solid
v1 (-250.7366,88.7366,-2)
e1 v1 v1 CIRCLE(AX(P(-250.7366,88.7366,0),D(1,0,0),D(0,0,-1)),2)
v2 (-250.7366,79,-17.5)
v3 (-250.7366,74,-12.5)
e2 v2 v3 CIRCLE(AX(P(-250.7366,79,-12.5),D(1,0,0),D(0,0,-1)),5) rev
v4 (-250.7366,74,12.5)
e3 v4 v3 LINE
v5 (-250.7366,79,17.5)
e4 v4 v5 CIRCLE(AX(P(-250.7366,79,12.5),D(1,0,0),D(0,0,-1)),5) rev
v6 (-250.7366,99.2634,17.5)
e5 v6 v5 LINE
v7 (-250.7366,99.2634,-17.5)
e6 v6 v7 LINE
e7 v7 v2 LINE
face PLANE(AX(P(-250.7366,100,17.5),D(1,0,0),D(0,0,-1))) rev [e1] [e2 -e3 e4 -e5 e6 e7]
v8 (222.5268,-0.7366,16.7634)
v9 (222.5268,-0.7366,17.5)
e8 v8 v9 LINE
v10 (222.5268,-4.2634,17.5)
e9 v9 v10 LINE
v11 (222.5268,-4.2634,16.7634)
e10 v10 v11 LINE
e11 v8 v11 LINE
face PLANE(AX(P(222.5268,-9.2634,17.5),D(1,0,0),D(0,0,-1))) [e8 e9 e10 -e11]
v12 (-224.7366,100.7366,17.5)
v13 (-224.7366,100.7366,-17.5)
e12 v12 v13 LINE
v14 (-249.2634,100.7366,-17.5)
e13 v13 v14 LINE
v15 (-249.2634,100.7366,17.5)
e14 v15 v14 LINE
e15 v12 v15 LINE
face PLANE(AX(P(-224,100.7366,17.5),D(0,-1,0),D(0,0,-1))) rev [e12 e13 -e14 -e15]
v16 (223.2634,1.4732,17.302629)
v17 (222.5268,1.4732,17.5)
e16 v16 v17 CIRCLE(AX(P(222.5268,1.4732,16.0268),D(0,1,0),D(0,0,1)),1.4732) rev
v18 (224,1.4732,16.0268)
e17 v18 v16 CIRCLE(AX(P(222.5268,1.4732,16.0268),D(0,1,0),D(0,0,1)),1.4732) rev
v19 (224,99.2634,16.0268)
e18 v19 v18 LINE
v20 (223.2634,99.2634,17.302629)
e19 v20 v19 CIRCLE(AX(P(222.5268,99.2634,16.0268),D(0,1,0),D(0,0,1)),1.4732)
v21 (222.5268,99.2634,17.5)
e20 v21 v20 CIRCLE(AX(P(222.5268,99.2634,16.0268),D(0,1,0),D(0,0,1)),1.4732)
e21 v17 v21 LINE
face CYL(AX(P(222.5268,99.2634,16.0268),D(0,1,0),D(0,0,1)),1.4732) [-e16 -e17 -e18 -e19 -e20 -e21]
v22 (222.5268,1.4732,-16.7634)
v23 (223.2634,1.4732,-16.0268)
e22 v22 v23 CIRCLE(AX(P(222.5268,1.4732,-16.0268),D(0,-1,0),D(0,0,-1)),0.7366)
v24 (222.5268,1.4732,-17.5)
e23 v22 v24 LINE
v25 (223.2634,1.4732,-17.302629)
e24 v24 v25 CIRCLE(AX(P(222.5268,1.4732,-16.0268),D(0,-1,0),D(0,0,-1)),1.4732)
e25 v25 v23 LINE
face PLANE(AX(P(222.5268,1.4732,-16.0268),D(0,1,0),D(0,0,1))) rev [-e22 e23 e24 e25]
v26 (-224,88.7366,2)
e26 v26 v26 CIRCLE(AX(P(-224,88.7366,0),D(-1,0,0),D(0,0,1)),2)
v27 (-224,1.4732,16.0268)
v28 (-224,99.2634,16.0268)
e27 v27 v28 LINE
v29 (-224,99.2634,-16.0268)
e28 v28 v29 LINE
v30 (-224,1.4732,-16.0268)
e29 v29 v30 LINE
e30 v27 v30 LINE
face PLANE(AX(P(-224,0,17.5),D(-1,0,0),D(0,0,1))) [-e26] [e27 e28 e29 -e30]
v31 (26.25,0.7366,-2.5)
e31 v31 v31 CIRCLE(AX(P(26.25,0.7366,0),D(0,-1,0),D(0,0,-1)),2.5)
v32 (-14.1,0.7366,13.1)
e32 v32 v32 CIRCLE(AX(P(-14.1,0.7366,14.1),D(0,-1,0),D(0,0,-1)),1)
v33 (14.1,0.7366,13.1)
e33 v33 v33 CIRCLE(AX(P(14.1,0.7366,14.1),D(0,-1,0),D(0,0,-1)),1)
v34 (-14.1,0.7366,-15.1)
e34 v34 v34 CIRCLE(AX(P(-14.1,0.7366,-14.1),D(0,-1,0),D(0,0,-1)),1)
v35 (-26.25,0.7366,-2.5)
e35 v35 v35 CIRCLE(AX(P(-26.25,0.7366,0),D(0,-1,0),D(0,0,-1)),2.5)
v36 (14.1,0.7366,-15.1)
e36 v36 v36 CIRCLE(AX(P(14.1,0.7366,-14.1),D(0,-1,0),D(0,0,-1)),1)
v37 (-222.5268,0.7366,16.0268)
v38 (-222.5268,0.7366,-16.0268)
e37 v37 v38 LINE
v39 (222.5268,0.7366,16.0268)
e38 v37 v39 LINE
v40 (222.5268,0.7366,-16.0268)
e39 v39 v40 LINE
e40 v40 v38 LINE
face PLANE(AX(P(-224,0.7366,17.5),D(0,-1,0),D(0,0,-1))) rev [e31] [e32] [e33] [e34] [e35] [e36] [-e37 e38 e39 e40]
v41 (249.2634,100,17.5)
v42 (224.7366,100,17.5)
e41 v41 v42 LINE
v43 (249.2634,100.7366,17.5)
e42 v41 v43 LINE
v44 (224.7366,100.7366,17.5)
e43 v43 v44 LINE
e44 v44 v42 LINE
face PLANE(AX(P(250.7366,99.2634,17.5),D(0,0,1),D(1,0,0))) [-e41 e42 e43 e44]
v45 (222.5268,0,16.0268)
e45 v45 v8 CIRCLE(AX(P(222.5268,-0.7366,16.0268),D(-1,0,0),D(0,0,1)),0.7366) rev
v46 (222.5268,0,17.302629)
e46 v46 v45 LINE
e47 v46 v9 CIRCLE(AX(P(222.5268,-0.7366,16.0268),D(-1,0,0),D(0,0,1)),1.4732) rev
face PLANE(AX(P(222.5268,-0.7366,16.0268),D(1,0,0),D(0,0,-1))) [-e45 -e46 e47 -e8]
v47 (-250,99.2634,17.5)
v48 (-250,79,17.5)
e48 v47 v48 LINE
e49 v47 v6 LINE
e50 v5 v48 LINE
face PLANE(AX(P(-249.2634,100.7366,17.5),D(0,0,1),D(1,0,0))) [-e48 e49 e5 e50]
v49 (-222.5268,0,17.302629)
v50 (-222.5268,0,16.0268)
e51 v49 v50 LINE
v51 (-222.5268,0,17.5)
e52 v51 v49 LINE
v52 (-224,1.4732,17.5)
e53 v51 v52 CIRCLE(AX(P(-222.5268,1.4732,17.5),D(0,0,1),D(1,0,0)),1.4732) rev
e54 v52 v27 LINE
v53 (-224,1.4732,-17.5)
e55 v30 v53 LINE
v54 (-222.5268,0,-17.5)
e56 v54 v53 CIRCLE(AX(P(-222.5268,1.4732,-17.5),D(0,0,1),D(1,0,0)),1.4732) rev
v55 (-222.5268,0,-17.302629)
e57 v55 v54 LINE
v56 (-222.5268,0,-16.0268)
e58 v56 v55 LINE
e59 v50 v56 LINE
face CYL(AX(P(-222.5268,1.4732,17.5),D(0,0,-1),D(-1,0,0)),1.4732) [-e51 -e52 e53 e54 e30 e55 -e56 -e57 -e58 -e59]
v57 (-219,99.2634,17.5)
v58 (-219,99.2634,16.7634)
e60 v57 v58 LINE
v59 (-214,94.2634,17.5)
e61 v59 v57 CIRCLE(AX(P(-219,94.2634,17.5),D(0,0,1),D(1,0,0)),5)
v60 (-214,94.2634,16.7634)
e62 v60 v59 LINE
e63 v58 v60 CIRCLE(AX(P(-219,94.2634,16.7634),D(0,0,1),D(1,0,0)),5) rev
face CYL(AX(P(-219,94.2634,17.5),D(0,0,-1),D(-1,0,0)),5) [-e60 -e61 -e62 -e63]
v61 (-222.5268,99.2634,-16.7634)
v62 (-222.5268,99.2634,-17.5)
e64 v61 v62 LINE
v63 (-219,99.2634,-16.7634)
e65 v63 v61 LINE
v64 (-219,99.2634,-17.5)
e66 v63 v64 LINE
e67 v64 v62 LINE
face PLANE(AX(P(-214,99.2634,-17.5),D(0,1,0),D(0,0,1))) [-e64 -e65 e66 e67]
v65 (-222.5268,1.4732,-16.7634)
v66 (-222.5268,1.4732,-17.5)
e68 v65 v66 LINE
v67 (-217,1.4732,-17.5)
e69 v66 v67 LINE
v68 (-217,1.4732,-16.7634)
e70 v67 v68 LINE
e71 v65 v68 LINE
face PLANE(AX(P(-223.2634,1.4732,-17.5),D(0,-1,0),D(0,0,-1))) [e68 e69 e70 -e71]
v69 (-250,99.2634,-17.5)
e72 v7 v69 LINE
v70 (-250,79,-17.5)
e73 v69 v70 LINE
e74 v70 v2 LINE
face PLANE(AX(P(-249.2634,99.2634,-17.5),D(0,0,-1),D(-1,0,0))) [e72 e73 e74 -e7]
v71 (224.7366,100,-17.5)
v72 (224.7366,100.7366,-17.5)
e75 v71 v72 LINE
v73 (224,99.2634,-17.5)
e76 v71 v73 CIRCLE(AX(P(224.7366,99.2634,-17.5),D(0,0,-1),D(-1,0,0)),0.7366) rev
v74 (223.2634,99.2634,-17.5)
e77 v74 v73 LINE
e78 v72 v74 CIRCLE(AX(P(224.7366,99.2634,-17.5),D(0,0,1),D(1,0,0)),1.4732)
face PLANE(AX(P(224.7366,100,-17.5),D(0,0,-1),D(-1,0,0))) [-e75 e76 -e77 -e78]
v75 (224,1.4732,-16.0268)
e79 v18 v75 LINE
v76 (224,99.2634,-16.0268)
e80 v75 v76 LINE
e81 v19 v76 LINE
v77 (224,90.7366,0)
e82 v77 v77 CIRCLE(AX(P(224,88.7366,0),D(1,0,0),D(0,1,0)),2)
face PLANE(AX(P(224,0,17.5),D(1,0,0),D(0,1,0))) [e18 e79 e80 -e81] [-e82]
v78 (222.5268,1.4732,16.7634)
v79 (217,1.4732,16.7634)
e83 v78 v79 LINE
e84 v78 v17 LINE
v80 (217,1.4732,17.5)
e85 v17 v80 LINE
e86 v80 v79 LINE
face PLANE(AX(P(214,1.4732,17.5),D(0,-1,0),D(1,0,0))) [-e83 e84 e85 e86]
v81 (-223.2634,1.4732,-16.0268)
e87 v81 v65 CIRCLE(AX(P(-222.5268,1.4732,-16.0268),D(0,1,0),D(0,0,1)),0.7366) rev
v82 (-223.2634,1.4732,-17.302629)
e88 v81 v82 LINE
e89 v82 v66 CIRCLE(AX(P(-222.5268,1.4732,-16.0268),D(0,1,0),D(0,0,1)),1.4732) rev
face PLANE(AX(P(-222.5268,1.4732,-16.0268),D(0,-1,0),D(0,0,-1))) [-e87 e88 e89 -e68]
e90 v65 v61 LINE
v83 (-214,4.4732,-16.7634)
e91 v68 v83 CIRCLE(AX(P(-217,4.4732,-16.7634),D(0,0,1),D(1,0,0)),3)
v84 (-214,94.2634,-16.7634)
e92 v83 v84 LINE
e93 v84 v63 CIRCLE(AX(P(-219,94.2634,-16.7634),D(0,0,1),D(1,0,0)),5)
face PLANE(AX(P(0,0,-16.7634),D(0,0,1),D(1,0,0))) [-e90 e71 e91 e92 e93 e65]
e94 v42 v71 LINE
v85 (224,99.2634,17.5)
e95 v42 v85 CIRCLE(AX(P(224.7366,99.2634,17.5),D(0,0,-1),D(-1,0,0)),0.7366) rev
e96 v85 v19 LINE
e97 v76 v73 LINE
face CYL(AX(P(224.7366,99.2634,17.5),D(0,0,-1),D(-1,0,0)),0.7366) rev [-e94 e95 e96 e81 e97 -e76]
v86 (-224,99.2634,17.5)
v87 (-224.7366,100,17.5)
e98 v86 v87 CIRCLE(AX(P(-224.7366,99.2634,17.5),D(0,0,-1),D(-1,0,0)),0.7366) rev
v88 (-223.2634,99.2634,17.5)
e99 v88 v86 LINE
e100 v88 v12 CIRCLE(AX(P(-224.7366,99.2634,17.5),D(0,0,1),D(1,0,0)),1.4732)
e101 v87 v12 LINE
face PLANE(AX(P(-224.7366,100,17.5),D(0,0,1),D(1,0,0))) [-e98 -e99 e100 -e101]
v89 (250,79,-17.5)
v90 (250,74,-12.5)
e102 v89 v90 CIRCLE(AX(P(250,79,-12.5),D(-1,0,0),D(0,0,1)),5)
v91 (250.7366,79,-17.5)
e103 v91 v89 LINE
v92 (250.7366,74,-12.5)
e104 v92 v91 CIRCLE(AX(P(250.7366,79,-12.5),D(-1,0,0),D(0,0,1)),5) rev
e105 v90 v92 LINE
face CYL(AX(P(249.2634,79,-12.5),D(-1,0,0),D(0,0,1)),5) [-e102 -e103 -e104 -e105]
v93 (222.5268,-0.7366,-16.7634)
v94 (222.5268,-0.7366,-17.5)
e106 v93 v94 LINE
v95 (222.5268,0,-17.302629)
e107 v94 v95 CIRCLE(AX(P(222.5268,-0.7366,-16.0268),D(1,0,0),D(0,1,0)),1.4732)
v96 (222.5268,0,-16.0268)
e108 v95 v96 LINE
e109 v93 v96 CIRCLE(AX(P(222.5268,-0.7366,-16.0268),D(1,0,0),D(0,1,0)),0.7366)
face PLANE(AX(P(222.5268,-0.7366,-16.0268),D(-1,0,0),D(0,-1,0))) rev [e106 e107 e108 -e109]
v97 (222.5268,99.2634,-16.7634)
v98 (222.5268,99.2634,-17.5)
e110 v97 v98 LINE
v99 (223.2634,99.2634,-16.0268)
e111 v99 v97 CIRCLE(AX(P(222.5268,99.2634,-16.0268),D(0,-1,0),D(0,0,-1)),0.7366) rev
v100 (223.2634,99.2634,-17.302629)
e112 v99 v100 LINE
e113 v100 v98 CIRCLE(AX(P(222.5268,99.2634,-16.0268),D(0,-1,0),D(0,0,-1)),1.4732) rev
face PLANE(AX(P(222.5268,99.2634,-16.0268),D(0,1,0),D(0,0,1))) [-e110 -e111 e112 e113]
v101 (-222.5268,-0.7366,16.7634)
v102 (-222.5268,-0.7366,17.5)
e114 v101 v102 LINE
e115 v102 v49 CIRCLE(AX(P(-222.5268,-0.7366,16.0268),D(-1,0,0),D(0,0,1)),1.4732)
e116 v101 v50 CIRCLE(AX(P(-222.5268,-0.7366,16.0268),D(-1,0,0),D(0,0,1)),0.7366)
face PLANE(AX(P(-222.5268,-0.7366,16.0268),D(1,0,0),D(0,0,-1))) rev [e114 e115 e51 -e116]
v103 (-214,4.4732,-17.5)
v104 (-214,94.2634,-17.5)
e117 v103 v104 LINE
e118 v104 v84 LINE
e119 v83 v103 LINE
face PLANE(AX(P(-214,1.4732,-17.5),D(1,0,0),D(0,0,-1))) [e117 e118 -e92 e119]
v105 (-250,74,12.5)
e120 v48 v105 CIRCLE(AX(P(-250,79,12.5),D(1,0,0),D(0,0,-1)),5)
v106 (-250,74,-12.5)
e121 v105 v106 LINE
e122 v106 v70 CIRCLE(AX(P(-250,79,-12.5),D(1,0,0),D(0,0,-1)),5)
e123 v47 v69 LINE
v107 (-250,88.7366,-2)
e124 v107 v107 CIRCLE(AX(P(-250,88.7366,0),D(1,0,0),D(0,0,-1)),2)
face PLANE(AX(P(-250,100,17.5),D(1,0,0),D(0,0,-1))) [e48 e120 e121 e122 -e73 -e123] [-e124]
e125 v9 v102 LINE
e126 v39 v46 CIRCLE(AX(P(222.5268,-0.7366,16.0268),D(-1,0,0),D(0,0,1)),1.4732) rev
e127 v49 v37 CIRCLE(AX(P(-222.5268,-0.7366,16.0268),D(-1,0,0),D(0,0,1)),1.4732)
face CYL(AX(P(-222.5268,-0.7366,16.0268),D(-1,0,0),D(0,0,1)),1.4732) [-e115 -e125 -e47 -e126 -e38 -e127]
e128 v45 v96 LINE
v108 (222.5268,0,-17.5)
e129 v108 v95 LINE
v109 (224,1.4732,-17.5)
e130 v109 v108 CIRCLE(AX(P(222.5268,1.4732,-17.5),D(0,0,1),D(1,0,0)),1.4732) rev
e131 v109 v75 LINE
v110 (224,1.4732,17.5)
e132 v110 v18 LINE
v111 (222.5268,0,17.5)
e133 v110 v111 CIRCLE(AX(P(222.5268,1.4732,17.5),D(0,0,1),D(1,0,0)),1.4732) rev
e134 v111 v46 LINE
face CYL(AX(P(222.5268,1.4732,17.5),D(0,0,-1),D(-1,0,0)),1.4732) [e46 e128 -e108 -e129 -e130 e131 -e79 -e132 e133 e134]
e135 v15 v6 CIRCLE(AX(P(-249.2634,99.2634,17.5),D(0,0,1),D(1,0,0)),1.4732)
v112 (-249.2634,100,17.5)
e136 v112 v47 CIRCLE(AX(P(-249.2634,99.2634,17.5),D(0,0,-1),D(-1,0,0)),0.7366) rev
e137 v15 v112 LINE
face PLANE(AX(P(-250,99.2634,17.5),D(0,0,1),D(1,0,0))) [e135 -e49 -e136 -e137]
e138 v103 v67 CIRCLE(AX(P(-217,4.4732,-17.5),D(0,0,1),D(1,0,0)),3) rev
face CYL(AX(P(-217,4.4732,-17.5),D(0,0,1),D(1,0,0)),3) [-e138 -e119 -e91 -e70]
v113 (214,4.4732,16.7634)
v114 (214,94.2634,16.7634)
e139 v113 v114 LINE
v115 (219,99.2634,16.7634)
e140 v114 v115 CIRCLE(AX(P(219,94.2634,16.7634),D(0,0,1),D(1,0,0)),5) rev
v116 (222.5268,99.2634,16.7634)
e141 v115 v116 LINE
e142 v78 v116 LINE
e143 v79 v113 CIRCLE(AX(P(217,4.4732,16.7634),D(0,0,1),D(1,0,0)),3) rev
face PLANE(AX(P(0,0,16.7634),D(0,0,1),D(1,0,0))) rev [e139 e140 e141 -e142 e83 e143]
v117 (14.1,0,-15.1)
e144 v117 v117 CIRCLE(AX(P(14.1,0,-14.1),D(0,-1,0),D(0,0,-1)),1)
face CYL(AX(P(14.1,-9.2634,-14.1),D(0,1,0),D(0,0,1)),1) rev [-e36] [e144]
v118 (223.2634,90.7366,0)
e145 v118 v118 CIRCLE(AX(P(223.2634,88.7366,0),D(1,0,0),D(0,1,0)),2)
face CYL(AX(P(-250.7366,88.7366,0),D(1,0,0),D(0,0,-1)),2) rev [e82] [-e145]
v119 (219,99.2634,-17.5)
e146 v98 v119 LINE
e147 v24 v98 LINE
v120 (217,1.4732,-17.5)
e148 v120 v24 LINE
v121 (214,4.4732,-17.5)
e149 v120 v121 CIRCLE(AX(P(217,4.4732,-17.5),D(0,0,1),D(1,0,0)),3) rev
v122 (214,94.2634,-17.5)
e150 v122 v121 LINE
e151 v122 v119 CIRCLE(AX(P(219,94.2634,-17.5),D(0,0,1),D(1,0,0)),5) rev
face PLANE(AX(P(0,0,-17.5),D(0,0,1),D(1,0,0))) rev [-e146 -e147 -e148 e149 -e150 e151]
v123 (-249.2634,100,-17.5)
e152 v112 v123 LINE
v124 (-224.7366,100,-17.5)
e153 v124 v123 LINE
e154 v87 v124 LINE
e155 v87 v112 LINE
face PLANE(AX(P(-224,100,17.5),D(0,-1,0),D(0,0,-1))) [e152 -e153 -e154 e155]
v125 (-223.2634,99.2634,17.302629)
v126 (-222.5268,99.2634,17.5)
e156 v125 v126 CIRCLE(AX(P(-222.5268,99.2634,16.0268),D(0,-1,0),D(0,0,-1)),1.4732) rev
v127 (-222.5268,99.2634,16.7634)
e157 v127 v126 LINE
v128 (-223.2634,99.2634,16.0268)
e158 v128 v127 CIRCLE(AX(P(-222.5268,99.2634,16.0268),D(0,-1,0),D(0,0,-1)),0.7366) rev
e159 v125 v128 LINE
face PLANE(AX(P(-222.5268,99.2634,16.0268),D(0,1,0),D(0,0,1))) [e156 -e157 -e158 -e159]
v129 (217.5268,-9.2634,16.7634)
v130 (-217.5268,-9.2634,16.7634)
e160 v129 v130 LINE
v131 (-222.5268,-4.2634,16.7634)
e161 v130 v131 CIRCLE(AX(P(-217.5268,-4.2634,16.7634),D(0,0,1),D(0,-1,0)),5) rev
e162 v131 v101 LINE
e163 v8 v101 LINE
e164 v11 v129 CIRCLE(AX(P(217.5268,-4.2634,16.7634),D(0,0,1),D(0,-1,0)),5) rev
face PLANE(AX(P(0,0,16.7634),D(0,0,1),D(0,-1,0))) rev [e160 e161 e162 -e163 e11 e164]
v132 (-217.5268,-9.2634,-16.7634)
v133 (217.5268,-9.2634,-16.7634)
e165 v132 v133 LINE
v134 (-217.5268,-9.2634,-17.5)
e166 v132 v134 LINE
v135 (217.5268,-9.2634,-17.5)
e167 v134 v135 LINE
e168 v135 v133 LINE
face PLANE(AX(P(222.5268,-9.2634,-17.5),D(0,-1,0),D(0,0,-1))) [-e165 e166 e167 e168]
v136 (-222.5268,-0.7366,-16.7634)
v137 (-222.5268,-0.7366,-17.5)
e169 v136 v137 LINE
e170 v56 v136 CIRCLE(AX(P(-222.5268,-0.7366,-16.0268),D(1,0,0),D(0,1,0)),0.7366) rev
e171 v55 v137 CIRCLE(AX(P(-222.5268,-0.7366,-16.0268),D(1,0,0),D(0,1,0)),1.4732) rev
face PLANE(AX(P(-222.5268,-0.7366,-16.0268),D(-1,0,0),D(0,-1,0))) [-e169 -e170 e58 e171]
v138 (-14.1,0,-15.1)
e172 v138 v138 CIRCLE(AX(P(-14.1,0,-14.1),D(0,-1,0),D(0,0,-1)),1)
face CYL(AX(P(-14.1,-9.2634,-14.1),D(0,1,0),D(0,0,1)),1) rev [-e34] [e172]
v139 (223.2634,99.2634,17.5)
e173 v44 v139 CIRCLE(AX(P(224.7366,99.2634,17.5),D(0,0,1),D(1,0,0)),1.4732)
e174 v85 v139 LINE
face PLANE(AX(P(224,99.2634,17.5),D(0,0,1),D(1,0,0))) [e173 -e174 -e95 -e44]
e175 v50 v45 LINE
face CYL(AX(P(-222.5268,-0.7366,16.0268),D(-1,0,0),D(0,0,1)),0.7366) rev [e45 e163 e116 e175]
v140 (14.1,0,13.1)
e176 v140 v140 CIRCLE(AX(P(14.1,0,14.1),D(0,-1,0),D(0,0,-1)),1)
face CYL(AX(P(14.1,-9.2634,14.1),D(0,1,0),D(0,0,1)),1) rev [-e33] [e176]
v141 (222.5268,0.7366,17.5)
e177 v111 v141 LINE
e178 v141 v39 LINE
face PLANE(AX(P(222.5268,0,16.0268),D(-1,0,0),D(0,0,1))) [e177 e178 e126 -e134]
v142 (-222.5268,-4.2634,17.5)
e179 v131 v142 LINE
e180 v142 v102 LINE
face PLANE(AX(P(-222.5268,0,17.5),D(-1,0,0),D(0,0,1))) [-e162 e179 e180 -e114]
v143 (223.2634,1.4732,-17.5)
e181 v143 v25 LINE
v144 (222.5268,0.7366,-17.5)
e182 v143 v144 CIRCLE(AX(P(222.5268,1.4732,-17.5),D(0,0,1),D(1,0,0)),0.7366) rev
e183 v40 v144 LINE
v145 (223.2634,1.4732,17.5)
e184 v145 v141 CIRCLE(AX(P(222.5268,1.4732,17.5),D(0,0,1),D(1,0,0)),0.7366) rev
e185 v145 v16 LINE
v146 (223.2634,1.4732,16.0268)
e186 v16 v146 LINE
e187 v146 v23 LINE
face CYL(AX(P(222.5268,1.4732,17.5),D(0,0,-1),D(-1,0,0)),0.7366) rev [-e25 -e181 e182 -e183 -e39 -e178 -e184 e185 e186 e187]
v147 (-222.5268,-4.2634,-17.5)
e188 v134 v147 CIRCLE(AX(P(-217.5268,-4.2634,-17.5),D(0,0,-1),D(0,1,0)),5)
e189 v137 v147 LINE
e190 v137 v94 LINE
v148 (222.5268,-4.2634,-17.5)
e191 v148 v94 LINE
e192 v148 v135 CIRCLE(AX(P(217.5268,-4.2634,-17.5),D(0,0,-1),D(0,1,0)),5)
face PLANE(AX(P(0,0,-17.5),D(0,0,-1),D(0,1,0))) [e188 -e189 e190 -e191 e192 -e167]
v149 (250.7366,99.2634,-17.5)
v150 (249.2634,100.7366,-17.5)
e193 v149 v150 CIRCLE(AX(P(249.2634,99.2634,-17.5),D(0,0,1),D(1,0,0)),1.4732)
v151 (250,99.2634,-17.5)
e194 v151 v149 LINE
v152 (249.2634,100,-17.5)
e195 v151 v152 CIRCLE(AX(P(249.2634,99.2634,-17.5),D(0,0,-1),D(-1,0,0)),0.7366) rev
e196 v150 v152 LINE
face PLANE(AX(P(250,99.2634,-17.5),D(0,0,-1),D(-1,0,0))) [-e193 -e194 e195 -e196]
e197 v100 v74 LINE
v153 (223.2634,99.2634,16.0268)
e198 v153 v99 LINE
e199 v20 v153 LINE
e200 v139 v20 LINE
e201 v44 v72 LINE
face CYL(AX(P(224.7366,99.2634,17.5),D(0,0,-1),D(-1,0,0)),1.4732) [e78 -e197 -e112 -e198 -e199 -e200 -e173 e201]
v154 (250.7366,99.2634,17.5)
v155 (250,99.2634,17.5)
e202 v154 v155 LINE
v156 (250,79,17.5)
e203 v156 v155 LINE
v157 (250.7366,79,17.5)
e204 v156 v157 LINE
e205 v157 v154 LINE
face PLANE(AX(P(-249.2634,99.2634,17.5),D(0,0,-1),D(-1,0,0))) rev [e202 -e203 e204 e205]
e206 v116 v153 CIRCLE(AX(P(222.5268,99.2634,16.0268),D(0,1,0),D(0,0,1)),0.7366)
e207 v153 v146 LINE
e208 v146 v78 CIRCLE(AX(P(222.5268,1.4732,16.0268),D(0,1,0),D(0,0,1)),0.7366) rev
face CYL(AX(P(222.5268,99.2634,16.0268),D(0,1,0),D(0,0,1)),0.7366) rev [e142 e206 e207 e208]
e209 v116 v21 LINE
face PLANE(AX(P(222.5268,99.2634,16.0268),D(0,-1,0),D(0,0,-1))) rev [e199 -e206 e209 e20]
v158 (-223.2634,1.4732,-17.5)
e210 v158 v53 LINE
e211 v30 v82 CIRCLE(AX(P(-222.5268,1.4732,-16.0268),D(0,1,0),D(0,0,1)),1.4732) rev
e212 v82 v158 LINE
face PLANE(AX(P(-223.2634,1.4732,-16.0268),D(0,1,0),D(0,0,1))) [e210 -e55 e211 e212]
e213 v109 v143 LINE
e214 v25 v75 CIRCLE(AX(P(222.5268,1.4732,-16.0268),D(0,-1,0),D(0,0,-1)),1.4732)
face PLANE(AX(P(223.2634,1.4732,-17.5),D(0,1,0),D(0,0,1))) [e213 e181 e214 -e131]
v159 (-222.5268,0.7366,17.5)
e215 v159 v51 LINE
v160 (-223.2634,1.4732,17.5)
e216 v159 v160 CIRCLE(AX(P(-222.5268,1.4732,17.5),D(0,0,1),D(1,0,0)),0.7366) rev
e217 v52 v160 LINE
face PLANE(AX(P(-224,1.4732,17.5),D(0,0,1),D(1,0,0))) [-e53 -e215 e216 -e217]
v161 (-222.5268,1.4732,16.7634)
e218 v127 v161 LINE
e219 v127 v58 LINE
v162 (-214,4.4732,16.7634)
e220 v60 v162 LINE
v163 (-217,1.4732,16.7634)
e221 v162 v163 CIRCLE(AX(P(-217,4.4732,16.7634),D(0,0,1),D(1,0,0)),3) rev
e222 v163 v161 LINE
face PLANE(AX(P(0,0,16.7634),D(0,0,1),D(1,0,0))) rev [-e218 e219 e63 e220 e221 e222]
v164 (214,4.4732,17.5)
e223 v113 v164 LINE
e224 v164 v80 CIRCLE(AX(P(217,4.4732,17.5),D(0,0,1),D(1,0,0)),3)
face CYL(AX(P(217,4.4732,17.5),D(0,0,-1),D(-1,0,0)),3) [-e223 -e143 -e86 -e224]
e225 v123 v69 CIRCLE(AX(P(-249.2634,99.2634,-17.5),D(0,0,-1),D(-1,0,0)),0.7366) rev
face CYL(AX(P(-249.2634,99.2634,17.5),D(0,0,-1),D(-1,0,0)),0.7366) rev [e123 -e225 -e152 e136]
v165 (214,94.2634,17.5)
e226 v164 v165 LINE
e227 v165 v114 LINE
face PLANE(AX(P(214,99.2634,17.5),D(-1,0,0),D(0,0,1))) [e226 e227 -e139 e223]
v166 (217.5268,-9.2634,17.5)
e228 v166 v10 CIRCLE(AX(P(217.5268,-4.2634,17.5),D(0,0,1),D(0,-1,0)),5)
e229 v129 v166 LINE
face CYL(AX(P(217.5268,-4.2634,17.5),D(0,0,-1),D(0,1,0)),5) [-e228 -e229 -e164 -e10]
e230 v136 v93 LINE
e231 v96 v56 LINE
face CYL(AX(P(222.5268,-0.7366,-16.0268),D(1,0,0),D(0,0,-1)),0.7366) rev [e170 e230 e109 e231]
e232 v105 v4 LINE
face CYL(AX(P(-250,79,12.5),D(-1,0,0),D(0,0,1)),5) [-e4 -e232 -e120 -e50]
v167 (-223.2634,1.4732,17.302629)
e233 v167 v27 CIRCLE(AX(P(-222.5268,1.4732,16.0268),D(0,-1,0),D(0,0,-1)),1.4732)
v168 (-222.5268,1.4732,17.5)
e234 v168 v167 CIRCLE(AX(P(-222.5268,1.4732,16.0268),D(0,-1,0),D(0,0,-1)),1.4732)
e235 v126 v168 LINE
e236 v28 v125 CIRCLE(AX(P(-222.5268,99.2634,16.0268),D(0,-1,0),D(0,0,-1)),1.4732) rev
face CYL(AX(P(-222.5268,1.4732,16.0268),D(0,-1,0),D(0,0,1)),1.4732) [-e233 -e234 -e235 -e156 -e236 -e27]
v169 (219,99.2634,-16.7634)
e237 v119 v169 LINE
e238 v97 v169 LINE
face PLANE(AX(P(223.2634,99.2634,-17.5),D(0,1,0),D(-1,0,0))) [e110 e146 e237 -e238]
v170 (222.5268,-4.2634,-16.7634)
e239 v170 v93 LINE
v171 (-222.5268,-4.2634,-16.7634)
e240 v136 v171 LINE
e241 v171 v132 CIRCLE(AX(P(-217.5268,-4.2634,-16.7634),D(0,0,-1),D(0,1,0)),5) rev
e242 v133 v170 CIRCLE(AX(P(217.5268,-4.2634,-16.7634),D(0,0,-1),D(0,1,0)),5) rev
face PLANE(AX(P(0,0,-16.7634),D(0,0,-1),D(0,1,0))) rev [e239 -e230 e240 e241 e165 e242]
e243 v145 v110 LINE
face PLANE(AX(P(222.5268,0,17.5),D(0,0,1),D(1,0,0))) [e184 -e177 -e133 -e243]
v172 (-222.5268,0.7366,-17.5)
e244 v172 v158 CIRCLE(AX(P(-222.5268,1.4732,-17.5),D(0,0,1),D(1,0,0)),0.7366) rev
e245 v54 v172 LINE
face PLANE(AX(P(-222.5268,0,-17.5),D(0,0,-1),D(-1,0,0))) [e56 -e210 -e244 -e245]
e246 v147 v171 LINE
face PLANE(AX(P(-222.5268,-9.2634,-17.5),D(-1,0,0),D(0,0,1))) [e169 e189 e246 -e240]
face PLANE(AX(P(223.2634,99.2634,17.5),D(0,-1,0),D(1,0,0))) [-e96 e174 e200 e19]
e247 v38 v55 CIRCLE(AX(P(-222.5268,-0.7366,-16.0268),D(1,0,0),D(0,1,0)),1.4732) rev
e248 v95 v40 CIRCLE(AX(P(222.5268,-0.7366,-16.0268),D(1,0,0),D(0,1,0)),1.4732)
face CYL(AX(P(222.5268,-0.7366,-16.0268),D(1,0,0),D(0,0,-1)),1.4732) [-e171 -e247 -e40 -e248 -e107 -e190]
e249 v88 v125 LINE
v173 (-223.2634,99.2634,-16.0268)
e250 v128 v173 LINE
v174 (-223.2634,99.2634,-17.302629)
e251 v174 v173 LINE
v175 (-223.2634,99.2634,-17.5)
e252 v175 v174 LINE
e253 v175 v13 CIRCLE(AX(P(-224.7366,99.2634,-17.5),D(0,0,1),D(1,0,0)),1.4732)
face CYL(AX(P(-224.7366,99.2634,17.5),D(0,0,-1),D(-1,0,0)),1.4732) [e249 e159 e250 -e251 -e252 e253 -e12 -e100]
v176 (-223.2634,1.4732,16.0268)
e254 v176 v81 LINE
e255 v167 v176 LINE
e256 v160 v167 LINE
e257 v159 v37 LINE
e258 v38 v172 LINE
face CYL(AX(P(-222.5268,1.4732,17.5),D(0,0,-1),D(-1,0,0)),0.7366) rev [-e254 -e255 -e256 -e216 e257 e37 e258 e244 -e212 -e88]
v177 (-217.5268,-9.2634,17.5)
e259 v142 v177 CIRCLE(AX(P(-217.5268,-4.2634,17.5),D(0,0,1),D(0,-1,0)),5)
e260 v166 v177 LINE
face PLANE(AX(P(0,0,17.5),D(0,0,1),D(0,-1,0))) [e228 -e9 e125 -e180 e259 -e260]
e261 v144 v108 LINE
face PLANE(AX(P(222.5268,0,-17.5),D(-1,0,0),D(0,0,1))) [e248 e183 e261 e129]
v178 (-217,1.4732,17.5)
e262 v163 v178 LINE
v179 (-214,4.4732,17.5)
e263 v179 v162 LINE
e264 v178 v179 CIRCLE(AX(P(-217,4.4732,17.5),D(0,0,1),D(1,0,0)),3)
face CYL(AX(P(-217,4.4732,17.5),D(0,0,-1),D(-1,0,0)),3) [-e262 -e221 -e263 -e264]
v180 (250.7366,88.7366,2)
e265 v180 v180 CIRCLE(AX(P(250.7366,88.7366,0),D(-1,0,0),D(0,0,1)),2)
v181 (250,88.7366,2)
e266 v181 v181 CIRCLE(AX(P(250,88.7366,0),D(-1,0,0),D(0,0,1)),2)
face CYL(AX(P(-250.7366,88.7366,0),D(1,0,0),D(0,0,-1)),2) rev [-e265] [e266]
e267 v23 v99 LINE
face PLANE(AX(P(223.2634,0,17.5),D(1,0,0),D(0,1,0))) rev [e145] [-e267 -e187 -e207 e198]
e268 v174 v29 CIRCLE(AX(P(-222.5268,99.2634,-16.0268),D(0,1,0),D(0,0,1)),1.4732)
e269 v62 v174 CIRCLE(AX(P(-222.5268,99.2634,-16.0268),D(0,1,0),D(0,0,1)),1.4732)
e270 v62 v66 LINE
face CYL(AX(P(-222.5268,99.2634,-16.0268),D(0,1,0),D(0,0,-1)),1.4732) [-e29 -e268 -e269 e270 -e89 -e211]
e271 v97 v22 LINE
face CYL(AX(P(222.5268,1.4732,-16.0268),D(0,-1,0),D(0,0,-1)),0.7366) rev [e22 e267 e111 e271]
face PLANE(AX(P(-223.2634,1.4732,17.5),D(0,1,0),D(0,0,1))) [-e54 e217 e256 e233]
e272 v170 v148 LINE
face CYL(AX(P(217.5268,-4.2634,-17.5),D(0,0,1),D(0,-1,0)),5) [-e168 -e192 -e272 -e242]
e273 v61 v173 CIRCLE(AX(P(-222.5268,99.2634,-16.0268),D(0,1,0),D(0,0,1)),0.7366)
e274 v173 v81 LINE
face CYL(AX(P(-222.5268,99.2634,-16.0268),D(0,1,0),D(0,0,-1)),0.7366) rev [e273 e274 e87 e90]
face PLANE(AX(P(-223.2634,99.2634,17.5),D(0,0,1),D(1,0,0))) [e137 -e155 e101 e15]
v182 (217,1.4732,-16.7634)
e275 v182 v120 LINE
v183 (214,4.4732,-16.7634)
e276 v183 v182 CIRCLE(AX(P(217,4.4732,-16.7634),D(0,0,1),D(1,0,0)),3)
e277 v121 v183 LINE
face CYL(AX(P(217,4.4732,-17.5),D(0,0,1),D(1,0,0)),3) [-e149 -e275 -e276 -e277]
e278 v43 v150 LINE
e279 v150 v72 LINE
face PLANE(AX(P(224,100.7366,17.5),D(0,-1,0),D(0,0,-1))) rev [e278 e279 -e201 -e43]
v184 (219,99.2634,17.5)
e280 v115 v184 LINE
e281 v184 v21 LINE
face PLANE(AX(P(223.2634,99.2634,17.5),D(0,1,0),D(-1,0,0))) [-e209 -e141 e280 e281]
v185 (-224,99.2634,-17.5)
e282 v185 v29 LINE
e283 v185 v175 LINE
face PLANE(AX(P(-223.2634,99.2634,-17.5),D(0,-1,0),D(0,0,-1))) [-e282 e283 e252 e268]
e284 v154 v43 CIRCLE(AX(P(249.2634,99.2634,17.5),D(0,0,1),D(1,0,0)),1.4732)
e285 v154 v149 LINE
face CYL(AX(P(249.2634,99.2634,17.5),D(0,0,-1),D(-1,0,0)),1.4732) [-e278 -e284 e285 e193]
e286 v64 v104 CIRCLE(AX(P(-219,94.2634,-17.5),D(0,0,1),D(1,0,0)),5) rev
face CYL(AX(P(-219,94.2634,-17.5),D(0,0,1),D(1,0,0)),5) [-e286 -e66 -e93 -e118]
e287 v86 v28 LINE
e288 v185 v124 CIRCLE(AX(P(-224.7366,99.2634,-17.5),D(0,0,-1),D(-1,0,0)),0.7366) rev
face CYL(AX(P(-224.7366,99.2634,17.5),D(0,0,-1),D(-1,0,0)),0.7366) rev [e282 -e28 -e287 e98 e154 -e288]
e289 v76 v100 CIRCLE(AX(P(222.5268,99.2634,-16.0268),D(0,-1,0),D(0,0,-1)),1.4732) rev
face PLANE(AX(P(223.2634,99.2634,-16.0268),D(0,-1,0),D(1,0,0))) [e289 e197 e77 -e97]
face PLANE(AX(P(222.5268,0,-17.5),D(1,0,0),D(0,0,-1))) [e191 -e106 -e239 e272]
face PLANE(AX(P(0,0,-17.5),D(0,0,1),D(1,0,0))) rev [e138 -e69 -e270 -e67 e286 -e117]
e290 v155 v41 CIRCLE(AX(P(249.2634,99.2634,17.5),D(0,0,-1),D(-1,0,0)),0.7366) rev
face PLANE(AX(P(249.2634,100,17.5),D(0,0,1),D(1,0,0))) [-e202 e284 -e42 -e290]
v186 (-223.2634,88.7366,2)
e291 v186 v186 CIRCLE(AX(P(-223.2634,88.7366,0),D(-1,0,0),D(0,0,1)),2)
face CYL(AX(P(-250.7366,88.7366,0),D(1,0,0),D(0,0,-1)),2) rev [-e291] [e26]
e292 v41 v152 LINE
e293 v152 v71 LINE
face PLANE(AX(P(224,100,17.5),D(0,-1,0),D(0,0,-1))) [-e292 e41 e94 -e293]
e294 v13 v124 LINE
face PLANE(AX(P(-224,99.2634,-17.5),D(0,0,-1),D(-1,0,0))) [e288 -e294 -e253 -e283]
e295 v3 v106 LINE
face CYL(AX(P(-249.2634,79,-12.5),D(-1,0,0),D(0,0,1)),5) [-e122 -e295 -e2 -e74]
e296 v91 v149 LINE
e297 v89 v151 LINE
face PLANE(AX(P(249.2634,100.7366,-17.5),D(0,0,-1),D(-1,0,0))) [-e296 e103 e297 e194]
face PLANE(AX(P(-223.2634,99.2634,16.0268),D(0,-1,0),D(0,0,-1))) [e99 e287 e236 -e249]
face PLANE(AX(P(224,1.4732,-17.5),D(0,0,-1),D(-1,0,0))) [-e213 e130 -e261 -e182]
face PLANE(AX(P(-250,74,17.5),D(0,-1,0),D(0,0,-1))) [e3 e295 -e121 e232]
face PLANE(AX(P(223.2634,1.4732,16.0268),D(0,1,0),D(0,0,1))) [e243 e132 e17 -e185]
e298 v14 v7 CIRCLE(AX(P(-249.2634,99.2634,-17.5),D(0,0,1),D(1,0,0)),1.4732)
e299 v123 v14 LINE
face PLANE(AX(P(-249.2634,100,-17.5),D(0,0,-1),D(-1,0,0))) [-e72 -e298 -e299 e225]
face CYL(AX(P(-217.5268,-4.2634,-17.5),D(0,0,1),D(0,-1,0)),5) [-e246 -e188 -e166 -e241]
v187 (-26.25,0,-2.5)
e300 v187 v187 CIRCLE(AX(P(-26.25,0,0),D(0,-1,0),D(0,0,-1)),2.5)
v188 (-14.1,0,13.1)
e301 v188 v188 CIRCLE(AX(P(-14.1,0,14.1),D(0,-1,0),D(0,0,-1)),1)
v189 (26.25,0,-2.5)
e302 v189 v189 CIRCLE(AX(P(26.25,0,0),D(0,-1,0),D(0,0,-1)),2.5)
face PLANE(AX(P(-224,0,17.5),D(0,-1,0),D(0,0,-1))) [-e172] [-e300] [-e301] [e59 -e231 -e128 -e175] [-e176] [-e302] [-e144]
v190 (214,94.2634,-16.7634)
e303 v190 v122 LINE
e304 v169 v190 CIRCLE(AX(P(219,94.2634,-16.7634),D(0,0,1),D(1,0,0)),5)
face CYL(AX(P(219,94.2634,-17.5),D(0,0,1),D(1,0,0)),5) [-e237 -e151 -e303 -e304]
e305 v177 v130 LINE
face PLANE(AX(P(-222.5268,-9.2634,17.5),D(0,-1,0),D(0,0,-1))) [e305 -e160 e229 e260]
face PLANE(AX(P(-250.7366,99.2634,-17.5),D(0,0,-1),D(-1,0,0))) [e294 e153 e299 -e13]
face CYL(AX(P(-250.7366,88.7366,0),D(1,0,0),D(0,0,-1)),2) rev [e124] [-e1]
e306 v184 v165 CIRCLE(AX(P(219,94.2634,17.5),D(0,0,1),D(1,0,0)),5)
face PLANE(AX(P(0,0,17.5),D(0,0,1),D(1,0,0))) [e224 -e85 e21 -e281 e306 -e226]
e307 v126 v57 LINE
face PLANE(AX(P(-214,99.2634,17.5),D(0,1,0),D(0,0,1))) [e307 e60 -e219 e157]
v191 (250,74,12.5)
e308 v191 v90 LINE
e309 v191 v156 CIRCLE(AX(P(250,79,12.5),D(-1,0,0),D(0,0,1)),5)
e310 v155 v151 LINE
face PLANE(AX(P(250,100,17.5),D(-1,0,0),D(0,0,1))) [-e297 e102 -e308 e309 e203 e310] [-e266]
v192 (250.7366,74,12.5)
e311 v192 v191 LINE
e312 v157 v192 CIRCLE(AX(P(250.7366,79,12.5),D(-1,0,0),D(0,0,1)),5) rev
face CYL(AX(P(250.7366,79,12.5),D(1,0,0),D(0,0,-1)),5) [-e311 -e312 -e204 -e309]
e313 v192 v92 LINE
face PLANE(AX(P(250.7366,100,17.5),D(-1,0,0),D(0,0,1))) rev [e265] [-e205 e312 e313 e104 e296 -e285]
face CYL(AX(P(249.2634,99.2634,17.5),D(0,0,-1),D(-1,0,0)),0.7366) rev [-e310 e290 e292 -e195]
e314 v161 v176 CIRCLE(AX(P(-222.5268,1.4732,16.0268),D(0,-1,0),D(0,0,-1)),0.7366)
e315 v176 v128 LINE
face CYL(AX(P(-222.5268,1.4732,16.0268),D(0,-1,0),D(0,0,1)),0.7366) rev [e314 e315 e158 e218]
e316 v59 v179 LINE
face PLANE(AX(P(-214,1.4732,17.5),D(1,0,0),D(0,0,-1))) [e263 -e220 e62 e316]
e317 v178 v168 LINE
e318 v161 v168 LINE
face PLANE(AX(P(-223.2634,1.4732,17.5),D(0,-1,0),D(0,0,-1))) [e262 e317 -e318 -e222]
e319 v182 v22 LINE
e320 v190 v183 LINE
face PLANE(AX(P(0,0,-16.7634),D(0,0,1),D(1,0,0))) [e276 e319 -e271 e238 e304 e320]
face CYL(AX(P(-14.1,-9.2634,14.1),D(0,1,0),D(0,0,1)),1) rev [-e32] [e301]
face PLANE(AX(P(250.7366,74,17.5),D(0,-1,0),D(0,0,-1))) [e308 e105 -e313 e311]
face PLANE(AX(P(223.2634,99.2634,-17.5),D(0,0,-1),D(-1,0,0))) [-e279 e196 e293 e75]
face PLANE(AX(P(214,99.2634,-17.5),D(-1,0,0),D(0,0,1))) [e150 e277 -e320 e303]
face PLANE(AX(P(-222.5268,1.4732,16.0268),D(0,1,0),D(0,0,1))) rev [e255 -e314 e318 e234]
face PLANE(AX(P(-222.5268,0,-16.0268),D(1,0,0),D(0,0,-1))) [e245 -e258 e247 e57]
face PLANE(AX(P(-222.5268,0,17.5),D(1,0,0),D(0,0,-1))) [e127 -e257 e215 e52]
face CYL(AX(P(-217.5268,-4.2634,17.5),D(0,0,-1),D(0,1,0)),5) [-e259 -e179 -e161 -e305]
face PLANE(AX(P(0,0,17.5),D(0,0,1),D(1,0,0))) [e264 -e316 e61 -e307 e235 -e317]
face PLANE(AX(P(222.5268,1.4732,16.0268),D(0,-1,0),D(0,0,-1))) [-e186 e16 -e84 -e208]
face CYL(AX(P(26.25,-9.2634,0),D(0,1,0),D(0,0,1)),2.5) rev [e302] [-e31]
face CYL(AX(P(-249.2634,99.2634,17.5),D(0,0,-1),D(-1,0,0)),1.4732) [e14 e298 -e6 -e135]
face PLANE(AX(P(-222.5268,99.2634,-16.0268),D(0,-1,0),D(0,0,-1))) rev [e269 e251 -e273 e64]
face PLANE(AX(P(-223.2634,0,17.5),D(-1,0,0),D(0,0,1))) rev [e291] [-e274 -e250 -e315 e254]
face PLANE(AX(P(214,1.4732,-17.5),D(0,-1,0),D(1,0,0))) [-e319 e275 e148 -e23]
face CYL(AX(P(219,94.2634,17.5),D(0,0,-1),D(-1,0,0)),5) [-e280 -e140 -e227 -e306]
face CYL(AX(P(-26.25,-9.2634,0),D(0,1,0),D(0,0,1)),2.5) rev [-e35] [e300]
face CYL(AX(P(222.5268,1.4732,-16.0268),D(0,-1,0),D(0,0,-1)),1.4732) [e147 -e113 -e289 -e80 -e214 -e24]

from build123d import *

# Parameters (mm, degrees)
BASE_FLANGE1_DEPTH             = 17.5
EDGE_FLANGE1_STRIP_W           = 4.4196
EDGE_FLANGE1_STRIP_H           = 0.7366
EDGE_FLANGE1_STRIP_CUT_DEPTH   = 445.0536
EDGE_FLANGE1_DEPTH             = 445.0536
EDGE_FLANGE2_STRIP_W           = 4.4196
EDGE_FLANGE2_STRIP_H           = 0.7366
EDGE_FLANGE2_STRIP_CUT_DEPTH   = 445.0536
EDGE_FLANGE2_DEPTH             = 445.0536
CUT_EXTRUDE1_DEPTH             = 512.790467768
CUT_EXTRUDE1_DEPTH_BACK        = 512.790467768
SKETCH16_R                     = 2
EDGE_FLANGE3_STRIP_W           = 4.4196
EDGE_FLANGE3_STRIP_H           = 0.7366
EDGE_FLANGE3_STRIP_CUT_DEPTH   = 97.7902
EDGE_FLANGE3_STRIP_2_W         = 4.4196
EDGE_FLANGE3_STRIP_2_H         = 0.7366
EDGE_FLANGE3_STRIP_CUT_2_DEPTH = 97.7902
EDGE_FLANGE3_DEPTH             = 97.7902
EDGE_FLANGE3_BEND_DEPTH        = 97.7902
EDGE_FLANGE4_STRIP_W           = 4.4196
EDGE_FLANGE4_STRIP_H           = 0.7366
EDGE_FLANGE4_STRIP_CUT_DEPTH   = 97.7902
EDGE_FLANGE4_STRIP_2_W         = 4.4196
EDGE_FLANGE4_STRIP_2_H         = 0.7366
EDGE_FLANGE4_STRIP_CUT_2_DEPTH = 97.7902
EDGE_FLANGE4_DEPTH             = 97.7902
EDGE_FLANGE4_BEND_DEPTH        = 97.7902
FILLET1_R                      = 5
FILLET2_R                      = 3
CUT_EXTRUDE2_DEPTH             = 271.508951016
CUT_EXTRUDE2_DEPTH_BACK        = 271.508951016
SKETCH29_R                     = 2.5
CUT_EXTRUDE3_DEPTH             = 271.508951016
CUT_EXTRUDE3_DEPTH_BACK        = 271.508951016
SKETCH30_R                     = 1


# Sheet-metal steps are written as plain solids
with BuildPart() as part:
    # Sketch1 → Base-Flange1 (new, symmetric)
    with BuildSketch(Plane.XY):
        with BuildLine():
            Line((-250, 74), (-250, 99.2634))
            ThreePointArc((-250, 99.2634), (-249.784254855, 99.784254855), (-249.2634, 100))
            Line((-249.2634, 100), (-224.7366, 100))
            ThreePointArc((-224.7366, 100), (-224.215745145, 99.784254855), (-224, 99.2634))
            Line((-224, 99.2634), (-224, 1.4732))
            ThreePointArc((-224, 1.4732), (-223.56850971, 0.43149029), (-222.5268, 0))
            Line((-222.5268, 0), (222.5268, 0))
            ThreePointArc((222.5268, 0), (223.56850971, 0.43149029), (224, 1.4732))
            Line((224, 1.4732), (224, 99.2634))
            ThreePointArc((224, 99.2634), (224.215745145, 99.784254855), (224.7366, 100))
            Line((224.7366, 100), (249.2634, 100))
            ThreePointArc((249.2634, 100), (249.784254855, 99.784254855), (250, 99.2634))
            Line((250, 99.2634), (250, 74))
            Line((250, 74), (250.7366, 74))
            Line((250.7366, 74), (250.7366, 99.2634))
            ThreePointArc((250.7366, 99.2634), (250.30510971, 100.30510971), (249.2634, 100.7366))
            Line((249.2634, 100.7366), (224.7366, 100.7366))
            ThreePointArc((224.7366, 100.7366), (223.69489029, 100.30510971), (223.2634, 99.2634))
            Line((223.2634, 99.2634), (223.2634, 1.4732))
            ThreePointArc((223.2634, 1.4732), (223.047654855, 0.952345145), (222.5268, 0.7366))
            Line((222.5268, 0.7366), (-222.5268, 0.7366))
            ThreePointArc((-222.5268, 0.7366), (-223.047654855, 0.952345145), (-223.2634, 1.4732))
            Line((-223.2634, 1.4732), (-223.2634, 99.2634))
            ThreePointArc((-223.2634, 99.2634), (-223.69489029, 100.30510971), (-224.7366, 100.7366))
            Line((-224.7366, 100.7366), (-249.2634, 100.7366))
            ThreePointArc((-249.2634, 100.7366), (-250.30510971, 100.30510971), (-250.7366, 99.2634))
            Line((-250.7366, 99.2634), (-250.7366, 74))
            Line((-250.7366, 74), (-250, 74))
        make_face()
    extrude(amount=BASE_FLANGE1_DEPTH, both=True)

    # Edge-Flange1 strip (across the edge) → Edge-Flange1 strip cut (cut)
    with BuildSketch(Plane(origin=(222.5268, 0, 17.5), x_dir=(0, 0, -1), z_dir=(-1, 0, 0))):
        with Locations((-0.7366, -0.3683)):
            Rectangle(EDGE_FLANGE1_STRIP_W, EDGE_FLANGE1_STRIP_H)
    extrude(amount=EDGE_FLANGE1_STRIP_CUT_DEPTH, mode=Mode.SUBTRACT)

    # Edge-Flange1 section (across the edge) → Edge-Flange1 (add)
    with BuildSketch(Plane(origin=(222.5268, 0, 17.5), x_dir=(0, 0, -1), z_dir=(-1, 0, 0))):
        with BuildLine():
            Line((0, 0.7366), (0, 9.2634))
            Line((0, 9.2634), (0.7366, 9.2634))
            Line((0.7366, 9.2634), (0.7366, 0.7366))
            ThreePointArc((0.7366, 0.7366), (0.952345145, 0.215745145), (1.4732, 0))
            Line((1.4732, 0), (1.4732, -0.7366))
            ThreePointArc((1.4732, -0.7366), (0.43149029, -0.30510971), (0, 0.7366))
        make_face()
    extrude(amount=EDGE_FLANGE1_DEPTH)

    # Edge-Flange2 strip (across the edge) → Edge-Flange2 strip cut (cut)
    with BuildSketch(Plane(origin=(-222.5268, 0, -17.5), x_dir=(0, 0, 1), z_dir=(1, 0, 0))):
        with Locations((-0.7366, -0.3683)):
            Rectangle(EDGE_FLANGE2_STRIP_W, EDGE_FLANGE2_STRIP_H)
    extrude(amount=EDGE_FLANGE2_STRIP_CUT_DEPTH, mode=Mode.SUBTRACT)

    # Edge-Flange2 section (across the edge) → Edge-Flange2 (add)
    with BuildSketch(Plane(origin=(-222.5268, 0, -17.5), x_dir=(0, 0, 1), z_dir=(1, 0, 0))):
        with BuildLine():
            Line((0, 0.7366), (0, 9.2634))
            Line((0, 9.2634), (0.7366, 9.2634))
            Line((0.7366, 9.2634), (0.7366, 0.7366))
            ThreePointArc((0.7366, 0.7366), (0.952345145, 0.215745145), (1.4732, 0))
            Line((1.4732, 0), (1.4732, -0.7366))
            ThreePointArc((1.4732, -0.7366), (0.43149029, -0.30510971), (0, 0.7366))
        make_face()
    extrude(amount=EDGE_FLANGE2_DEPTH)

    # Sketch16 → Cut-Extrude1 (cut, two sides: drawn at the far end of the back side and taken through both)
    with BuildSketch(Plane(origin=(250.7366, 0, 0), x_dir=(0, 0, -1), z_dir=(1, 0, 0)).offset(-CUT_EXTRUDE1_DEPTH_BACK)):
        with Locations(Location((0, 88.7366, 0), (0, 0, 180))):
            Circle(SKETCH16_R)
    extrude(amount=CUT_EXTRUDE1_DEPTH + CUT_EXTRUDE1_DEPTH_BACK, mode=Mode.SUBTRACT)

    # Edge-Flange3 strip (across the edge) → Edge-Flange3 strip cut (cut)
    with BuildSketch(Plane(origin=(-223.2634, 99.2634, 17.5), x_dir=(0, 0, -1), z_dir=(0, -1, 0))):
        with Locations((-0.7366, -0.3683)):
            Rectangle(EDGE_FLANGE3_STRIP_W, EDGE_FLANGE3_STRIP_H)
    extrude(amount=EDGE_FLANGE3_STRIP_CUT_DEPTH, mode=Mode.SUBTRACT)

    # Edge-Flange3 strip 2 (across the edge) → Edge-Flange3 strip cut 2 (cut)
    with BuildSketch(Plane(origin=(-223.2634, 1.4732, -17.5), x_dir=(0, 0, 1), z_dir=(0, 1, 0))):
        with Locations((-0.7366, -0.3683)):
            Rectangle(EDGE_FLANGE3_STRIP_2_W, EDGE_FLANGE3_STRIP_2_H)
    extrude(amount=EDGE_FLANGE3_STRIP_CUT_2_DEPTH, mode=Mode.SUBTRACT)

    # Edge-Flange3 section (across the edge) → Edge-Flange3 (add)
    with BuildSketch(Plane(origin=(-223.2634, 99.2634, 17.5), x_dir=(0, 0, -1), z_dir=(0, -1, 0))):
        with BuildLine():
            Line((0, 0.7366), (0, 9.2634))
            Line((0, 9.2634), (0.7366, 9.2634))
            Line((0.7366, 9.2634), (0.7366, 0.7366))
            ThreePointArc((0.7366, 0.7366), (0.952345145, 0.215745145), (1.4732, 0))
            Line((1.4732, 0), (1.4732, -0.7366))
            ThreePointArc((1.4732, -0.7366), (0.43149029, -0.30510971), (0, 0.7366))
        make_face()
    extrude(amount=EDGE_FLANGE3_DEPTH)

    # Edge-Flange3 section 2 (across the edge) → Edge-Flange3 bend (add)
    with BuildSketch(Plane(origin=(-223.2634, 1.4732, -17.5), x_dir=(0, 0, 1), z_dir=(0, 1, 0))):
        with BuildLine():
            Line((0, 0.7366), (0, 9.2634))
            Line((0, 9.2634), (0.7366, 9.2634))
            Line((0.7366, 9.2634), (0.7366, 0.7366))
            ThreePointArc((0.7366, 0.7366), (0.952345145, 0.215745145), (1.4732, 0))
            Line((1.4732, 0), (1.4732, -0.7366))
            ThreePointArc((1.4732, -0.7366), (0.43149029, -0.30510971), (0, 0.7366))
        make_face()
    extrude(amount=EDGE_FLANGE3_BEND_DEPTH)

    # Edge-Flange4 strip (across the edge) → Edge-Flange4 strip cut (cut)
    with BuildSketch(Plane(origin=(223.2634, 1.4732, 17.5), x_dir=(0, 0, -1), z_dir=(0, 1, 0))):
        with Locations((-0.7366, -0.3683)):
            Rectangle(EDGE_FLANGE4_STRIP_W, EDGE_FLANGE4_STRIP_H)
    extrude(amount=EDGE_FLANGE4_STRIP_CUT_DEPTH, mode=Mode.SUBTRACT)

    # Edge-Flange4 strip 2 (across the edge) → Edge-Flange4 strip cut 2 (cut)
    with BuildSketch(Plane(origin=(223.2634, 99.2634, -17.5), x_dir=(0, 0, 1), z_dir=(0, -1, 0))):
        with Locations((-0.7366, -0.3683)):
            Rectangle(EDGE_FLANGE4_STRIP_2_W, EDGE_FLANGE4_STRIP_2_H)
    extrude(amount=EDGE_FLANGE4_STRIP_CUT_2_DEPTH, mode=Mode.SUBTRACT)

    # Edge-Flange4 section (across the edge) → Edge-Flange4 (add)
    with BuildSketch(Plane(origin=(223.2634, 1.4732, 17.5), x_dir=(0, 0, -1), z_dir=(0, 1, 0))):
        with BuildLine():
            Line((0, 0.7366), (0, 9.2634))
            Line((0, 9.2634), (0.7366, 9.2634))
            Line((0.7366, 9.2634), (0.7366, 0.7366))
            ThreePointArc((0.7366, 0.7366), (0.952345145, 0.215745145), (1.4732, 0))
            Line((1.4732, 0), (1.4732, -0.7366))
            ThreePointArc((1.4732, -0.7366), (0.43149029, -0.30510971), (0, 0.7366))
        make_face()
    extrude(amount=EDGE_FLANGE4_DEPTH)

    # Edge-Flange4 section 2 (across the edge) → Edge-Flange4 bend (add)
    with BuildSketch(Plane(origin=(223.2634, 99.2634, -17.5), x_dir=(0, 0, 1), z_dir=(0, -1, 0))):
        with BuildLine():
            Line((0, 0.7366), (0, 9.2634))
            Line((0, 9.2634), (0.7366, 9.2634))
            Line((0.7366, 9.2634), (0.7366, 0.7366))
            ThreePointArc((0.7366, 0.7366), (0.952345145, 0.215745145), (1.4732, 0))
            Line((1.4732, 0), (1.4732, -0.7366))
            ThreePointArc((1.4732, -0.7366), (0.43149029, -0.30510971), (0, 0.7366))
        make_face()
    extrude(amount=EDGE_FLANGE4_BEND_DEPTH)

    # Fillet1
    fillet1_edges = [part.edges().sort_by_distance(p)[0] for p in [
        (222.5268, -9.2634, 17.1317),
        (-222.5268, -9.2634, 17.1317),
        (-222.5268, -9.2634, -17.1317),
        (222.5268, -9.2634, -17.1317),
        (-214, 99.2634, 17.1317),
        (250.3683, 74, -17.5),
        (-214, 99.2634, -17.1317),
        (-250.3683, 74, -17.5),
        (214, 99.2634, 17.1317),
        (214, 99.2634, -17.1317),
        (250.3683, 74, 17.5),
        (-250.3683, 74, 17.5),
    ]]
    fillet(fillet1_edges, radius=FILLET1_R)

    # Fillet2
    fillet2_edges = [part.edges().sort_by_distance(p)[0] for p in [
        (-214, 1.4732, 17.1317),
        (-214, 1.4732, -17.1317),
        (214, 1.4732, 17.1317),
        (214, 1.4732, -17.1317),
    ]]
    fillet(fillet2_edges, radius=FILLET2_R)

    # Sketch29 → Cut-Extrude2 (cut, two sides: drawn at the far end of the back side and taken through both)
    with BuildSketch(Plane(origin=(0, 0.7366, 0), x_dir=(1, 0, 0), z_dir=(0, 1, 0)).offset(-CUT_EXTRUDE2_DEPTH_BACK)):
        with Locations(Location((-26.25, 0, 0), (0, 0, 90))):
            Circle(SKETCH29_R)
        with Locations(Location((26.25, 0, 0), (0, 0, 90))):
            Circle(SKETCH29_R)
    extrude(amount=CUT_EXTRUDE2_DEPTH + CUT_EXTRUDE2_DEPTH_BACK, mode=Mode.SUBTRACT)

    # Sketch30 → Cut-Extrude3 (cut, two sides: drawn at the far end of the back side and taken through both)
    with BuildSketch(Plane(origin=(0, 0.7366, 0), x_dir=(1, 0, 0), z_dir=(0, 1, 0)).offset(-CUT_EXTRUDE3_DEPTH_BACK)):
        with Locations(Location((-14.1, 14.1, 0), (0, 0, 90))):
            Circle(SKETCH30_R)
        with Locations(Location((14.1, 14.1, 0), (0, 0, 90))):
            Circle(SKETCH30_R)
        with Locations(Location((14.1, -14.1, 0), (0, 0, 90))):
            Circle(SKETCH30_R)
        with Locations(Location((-14.1, -14.1, 0), (0, 0, 90))):
            Circle(SKETCH30_R)
    extrude(amount=CUT_EXTRUDE3_DEPTH + CUT_EXTRUDE3_DEPTH_BACK, mode=Mode.SUBTRACT)


solid = part.part
